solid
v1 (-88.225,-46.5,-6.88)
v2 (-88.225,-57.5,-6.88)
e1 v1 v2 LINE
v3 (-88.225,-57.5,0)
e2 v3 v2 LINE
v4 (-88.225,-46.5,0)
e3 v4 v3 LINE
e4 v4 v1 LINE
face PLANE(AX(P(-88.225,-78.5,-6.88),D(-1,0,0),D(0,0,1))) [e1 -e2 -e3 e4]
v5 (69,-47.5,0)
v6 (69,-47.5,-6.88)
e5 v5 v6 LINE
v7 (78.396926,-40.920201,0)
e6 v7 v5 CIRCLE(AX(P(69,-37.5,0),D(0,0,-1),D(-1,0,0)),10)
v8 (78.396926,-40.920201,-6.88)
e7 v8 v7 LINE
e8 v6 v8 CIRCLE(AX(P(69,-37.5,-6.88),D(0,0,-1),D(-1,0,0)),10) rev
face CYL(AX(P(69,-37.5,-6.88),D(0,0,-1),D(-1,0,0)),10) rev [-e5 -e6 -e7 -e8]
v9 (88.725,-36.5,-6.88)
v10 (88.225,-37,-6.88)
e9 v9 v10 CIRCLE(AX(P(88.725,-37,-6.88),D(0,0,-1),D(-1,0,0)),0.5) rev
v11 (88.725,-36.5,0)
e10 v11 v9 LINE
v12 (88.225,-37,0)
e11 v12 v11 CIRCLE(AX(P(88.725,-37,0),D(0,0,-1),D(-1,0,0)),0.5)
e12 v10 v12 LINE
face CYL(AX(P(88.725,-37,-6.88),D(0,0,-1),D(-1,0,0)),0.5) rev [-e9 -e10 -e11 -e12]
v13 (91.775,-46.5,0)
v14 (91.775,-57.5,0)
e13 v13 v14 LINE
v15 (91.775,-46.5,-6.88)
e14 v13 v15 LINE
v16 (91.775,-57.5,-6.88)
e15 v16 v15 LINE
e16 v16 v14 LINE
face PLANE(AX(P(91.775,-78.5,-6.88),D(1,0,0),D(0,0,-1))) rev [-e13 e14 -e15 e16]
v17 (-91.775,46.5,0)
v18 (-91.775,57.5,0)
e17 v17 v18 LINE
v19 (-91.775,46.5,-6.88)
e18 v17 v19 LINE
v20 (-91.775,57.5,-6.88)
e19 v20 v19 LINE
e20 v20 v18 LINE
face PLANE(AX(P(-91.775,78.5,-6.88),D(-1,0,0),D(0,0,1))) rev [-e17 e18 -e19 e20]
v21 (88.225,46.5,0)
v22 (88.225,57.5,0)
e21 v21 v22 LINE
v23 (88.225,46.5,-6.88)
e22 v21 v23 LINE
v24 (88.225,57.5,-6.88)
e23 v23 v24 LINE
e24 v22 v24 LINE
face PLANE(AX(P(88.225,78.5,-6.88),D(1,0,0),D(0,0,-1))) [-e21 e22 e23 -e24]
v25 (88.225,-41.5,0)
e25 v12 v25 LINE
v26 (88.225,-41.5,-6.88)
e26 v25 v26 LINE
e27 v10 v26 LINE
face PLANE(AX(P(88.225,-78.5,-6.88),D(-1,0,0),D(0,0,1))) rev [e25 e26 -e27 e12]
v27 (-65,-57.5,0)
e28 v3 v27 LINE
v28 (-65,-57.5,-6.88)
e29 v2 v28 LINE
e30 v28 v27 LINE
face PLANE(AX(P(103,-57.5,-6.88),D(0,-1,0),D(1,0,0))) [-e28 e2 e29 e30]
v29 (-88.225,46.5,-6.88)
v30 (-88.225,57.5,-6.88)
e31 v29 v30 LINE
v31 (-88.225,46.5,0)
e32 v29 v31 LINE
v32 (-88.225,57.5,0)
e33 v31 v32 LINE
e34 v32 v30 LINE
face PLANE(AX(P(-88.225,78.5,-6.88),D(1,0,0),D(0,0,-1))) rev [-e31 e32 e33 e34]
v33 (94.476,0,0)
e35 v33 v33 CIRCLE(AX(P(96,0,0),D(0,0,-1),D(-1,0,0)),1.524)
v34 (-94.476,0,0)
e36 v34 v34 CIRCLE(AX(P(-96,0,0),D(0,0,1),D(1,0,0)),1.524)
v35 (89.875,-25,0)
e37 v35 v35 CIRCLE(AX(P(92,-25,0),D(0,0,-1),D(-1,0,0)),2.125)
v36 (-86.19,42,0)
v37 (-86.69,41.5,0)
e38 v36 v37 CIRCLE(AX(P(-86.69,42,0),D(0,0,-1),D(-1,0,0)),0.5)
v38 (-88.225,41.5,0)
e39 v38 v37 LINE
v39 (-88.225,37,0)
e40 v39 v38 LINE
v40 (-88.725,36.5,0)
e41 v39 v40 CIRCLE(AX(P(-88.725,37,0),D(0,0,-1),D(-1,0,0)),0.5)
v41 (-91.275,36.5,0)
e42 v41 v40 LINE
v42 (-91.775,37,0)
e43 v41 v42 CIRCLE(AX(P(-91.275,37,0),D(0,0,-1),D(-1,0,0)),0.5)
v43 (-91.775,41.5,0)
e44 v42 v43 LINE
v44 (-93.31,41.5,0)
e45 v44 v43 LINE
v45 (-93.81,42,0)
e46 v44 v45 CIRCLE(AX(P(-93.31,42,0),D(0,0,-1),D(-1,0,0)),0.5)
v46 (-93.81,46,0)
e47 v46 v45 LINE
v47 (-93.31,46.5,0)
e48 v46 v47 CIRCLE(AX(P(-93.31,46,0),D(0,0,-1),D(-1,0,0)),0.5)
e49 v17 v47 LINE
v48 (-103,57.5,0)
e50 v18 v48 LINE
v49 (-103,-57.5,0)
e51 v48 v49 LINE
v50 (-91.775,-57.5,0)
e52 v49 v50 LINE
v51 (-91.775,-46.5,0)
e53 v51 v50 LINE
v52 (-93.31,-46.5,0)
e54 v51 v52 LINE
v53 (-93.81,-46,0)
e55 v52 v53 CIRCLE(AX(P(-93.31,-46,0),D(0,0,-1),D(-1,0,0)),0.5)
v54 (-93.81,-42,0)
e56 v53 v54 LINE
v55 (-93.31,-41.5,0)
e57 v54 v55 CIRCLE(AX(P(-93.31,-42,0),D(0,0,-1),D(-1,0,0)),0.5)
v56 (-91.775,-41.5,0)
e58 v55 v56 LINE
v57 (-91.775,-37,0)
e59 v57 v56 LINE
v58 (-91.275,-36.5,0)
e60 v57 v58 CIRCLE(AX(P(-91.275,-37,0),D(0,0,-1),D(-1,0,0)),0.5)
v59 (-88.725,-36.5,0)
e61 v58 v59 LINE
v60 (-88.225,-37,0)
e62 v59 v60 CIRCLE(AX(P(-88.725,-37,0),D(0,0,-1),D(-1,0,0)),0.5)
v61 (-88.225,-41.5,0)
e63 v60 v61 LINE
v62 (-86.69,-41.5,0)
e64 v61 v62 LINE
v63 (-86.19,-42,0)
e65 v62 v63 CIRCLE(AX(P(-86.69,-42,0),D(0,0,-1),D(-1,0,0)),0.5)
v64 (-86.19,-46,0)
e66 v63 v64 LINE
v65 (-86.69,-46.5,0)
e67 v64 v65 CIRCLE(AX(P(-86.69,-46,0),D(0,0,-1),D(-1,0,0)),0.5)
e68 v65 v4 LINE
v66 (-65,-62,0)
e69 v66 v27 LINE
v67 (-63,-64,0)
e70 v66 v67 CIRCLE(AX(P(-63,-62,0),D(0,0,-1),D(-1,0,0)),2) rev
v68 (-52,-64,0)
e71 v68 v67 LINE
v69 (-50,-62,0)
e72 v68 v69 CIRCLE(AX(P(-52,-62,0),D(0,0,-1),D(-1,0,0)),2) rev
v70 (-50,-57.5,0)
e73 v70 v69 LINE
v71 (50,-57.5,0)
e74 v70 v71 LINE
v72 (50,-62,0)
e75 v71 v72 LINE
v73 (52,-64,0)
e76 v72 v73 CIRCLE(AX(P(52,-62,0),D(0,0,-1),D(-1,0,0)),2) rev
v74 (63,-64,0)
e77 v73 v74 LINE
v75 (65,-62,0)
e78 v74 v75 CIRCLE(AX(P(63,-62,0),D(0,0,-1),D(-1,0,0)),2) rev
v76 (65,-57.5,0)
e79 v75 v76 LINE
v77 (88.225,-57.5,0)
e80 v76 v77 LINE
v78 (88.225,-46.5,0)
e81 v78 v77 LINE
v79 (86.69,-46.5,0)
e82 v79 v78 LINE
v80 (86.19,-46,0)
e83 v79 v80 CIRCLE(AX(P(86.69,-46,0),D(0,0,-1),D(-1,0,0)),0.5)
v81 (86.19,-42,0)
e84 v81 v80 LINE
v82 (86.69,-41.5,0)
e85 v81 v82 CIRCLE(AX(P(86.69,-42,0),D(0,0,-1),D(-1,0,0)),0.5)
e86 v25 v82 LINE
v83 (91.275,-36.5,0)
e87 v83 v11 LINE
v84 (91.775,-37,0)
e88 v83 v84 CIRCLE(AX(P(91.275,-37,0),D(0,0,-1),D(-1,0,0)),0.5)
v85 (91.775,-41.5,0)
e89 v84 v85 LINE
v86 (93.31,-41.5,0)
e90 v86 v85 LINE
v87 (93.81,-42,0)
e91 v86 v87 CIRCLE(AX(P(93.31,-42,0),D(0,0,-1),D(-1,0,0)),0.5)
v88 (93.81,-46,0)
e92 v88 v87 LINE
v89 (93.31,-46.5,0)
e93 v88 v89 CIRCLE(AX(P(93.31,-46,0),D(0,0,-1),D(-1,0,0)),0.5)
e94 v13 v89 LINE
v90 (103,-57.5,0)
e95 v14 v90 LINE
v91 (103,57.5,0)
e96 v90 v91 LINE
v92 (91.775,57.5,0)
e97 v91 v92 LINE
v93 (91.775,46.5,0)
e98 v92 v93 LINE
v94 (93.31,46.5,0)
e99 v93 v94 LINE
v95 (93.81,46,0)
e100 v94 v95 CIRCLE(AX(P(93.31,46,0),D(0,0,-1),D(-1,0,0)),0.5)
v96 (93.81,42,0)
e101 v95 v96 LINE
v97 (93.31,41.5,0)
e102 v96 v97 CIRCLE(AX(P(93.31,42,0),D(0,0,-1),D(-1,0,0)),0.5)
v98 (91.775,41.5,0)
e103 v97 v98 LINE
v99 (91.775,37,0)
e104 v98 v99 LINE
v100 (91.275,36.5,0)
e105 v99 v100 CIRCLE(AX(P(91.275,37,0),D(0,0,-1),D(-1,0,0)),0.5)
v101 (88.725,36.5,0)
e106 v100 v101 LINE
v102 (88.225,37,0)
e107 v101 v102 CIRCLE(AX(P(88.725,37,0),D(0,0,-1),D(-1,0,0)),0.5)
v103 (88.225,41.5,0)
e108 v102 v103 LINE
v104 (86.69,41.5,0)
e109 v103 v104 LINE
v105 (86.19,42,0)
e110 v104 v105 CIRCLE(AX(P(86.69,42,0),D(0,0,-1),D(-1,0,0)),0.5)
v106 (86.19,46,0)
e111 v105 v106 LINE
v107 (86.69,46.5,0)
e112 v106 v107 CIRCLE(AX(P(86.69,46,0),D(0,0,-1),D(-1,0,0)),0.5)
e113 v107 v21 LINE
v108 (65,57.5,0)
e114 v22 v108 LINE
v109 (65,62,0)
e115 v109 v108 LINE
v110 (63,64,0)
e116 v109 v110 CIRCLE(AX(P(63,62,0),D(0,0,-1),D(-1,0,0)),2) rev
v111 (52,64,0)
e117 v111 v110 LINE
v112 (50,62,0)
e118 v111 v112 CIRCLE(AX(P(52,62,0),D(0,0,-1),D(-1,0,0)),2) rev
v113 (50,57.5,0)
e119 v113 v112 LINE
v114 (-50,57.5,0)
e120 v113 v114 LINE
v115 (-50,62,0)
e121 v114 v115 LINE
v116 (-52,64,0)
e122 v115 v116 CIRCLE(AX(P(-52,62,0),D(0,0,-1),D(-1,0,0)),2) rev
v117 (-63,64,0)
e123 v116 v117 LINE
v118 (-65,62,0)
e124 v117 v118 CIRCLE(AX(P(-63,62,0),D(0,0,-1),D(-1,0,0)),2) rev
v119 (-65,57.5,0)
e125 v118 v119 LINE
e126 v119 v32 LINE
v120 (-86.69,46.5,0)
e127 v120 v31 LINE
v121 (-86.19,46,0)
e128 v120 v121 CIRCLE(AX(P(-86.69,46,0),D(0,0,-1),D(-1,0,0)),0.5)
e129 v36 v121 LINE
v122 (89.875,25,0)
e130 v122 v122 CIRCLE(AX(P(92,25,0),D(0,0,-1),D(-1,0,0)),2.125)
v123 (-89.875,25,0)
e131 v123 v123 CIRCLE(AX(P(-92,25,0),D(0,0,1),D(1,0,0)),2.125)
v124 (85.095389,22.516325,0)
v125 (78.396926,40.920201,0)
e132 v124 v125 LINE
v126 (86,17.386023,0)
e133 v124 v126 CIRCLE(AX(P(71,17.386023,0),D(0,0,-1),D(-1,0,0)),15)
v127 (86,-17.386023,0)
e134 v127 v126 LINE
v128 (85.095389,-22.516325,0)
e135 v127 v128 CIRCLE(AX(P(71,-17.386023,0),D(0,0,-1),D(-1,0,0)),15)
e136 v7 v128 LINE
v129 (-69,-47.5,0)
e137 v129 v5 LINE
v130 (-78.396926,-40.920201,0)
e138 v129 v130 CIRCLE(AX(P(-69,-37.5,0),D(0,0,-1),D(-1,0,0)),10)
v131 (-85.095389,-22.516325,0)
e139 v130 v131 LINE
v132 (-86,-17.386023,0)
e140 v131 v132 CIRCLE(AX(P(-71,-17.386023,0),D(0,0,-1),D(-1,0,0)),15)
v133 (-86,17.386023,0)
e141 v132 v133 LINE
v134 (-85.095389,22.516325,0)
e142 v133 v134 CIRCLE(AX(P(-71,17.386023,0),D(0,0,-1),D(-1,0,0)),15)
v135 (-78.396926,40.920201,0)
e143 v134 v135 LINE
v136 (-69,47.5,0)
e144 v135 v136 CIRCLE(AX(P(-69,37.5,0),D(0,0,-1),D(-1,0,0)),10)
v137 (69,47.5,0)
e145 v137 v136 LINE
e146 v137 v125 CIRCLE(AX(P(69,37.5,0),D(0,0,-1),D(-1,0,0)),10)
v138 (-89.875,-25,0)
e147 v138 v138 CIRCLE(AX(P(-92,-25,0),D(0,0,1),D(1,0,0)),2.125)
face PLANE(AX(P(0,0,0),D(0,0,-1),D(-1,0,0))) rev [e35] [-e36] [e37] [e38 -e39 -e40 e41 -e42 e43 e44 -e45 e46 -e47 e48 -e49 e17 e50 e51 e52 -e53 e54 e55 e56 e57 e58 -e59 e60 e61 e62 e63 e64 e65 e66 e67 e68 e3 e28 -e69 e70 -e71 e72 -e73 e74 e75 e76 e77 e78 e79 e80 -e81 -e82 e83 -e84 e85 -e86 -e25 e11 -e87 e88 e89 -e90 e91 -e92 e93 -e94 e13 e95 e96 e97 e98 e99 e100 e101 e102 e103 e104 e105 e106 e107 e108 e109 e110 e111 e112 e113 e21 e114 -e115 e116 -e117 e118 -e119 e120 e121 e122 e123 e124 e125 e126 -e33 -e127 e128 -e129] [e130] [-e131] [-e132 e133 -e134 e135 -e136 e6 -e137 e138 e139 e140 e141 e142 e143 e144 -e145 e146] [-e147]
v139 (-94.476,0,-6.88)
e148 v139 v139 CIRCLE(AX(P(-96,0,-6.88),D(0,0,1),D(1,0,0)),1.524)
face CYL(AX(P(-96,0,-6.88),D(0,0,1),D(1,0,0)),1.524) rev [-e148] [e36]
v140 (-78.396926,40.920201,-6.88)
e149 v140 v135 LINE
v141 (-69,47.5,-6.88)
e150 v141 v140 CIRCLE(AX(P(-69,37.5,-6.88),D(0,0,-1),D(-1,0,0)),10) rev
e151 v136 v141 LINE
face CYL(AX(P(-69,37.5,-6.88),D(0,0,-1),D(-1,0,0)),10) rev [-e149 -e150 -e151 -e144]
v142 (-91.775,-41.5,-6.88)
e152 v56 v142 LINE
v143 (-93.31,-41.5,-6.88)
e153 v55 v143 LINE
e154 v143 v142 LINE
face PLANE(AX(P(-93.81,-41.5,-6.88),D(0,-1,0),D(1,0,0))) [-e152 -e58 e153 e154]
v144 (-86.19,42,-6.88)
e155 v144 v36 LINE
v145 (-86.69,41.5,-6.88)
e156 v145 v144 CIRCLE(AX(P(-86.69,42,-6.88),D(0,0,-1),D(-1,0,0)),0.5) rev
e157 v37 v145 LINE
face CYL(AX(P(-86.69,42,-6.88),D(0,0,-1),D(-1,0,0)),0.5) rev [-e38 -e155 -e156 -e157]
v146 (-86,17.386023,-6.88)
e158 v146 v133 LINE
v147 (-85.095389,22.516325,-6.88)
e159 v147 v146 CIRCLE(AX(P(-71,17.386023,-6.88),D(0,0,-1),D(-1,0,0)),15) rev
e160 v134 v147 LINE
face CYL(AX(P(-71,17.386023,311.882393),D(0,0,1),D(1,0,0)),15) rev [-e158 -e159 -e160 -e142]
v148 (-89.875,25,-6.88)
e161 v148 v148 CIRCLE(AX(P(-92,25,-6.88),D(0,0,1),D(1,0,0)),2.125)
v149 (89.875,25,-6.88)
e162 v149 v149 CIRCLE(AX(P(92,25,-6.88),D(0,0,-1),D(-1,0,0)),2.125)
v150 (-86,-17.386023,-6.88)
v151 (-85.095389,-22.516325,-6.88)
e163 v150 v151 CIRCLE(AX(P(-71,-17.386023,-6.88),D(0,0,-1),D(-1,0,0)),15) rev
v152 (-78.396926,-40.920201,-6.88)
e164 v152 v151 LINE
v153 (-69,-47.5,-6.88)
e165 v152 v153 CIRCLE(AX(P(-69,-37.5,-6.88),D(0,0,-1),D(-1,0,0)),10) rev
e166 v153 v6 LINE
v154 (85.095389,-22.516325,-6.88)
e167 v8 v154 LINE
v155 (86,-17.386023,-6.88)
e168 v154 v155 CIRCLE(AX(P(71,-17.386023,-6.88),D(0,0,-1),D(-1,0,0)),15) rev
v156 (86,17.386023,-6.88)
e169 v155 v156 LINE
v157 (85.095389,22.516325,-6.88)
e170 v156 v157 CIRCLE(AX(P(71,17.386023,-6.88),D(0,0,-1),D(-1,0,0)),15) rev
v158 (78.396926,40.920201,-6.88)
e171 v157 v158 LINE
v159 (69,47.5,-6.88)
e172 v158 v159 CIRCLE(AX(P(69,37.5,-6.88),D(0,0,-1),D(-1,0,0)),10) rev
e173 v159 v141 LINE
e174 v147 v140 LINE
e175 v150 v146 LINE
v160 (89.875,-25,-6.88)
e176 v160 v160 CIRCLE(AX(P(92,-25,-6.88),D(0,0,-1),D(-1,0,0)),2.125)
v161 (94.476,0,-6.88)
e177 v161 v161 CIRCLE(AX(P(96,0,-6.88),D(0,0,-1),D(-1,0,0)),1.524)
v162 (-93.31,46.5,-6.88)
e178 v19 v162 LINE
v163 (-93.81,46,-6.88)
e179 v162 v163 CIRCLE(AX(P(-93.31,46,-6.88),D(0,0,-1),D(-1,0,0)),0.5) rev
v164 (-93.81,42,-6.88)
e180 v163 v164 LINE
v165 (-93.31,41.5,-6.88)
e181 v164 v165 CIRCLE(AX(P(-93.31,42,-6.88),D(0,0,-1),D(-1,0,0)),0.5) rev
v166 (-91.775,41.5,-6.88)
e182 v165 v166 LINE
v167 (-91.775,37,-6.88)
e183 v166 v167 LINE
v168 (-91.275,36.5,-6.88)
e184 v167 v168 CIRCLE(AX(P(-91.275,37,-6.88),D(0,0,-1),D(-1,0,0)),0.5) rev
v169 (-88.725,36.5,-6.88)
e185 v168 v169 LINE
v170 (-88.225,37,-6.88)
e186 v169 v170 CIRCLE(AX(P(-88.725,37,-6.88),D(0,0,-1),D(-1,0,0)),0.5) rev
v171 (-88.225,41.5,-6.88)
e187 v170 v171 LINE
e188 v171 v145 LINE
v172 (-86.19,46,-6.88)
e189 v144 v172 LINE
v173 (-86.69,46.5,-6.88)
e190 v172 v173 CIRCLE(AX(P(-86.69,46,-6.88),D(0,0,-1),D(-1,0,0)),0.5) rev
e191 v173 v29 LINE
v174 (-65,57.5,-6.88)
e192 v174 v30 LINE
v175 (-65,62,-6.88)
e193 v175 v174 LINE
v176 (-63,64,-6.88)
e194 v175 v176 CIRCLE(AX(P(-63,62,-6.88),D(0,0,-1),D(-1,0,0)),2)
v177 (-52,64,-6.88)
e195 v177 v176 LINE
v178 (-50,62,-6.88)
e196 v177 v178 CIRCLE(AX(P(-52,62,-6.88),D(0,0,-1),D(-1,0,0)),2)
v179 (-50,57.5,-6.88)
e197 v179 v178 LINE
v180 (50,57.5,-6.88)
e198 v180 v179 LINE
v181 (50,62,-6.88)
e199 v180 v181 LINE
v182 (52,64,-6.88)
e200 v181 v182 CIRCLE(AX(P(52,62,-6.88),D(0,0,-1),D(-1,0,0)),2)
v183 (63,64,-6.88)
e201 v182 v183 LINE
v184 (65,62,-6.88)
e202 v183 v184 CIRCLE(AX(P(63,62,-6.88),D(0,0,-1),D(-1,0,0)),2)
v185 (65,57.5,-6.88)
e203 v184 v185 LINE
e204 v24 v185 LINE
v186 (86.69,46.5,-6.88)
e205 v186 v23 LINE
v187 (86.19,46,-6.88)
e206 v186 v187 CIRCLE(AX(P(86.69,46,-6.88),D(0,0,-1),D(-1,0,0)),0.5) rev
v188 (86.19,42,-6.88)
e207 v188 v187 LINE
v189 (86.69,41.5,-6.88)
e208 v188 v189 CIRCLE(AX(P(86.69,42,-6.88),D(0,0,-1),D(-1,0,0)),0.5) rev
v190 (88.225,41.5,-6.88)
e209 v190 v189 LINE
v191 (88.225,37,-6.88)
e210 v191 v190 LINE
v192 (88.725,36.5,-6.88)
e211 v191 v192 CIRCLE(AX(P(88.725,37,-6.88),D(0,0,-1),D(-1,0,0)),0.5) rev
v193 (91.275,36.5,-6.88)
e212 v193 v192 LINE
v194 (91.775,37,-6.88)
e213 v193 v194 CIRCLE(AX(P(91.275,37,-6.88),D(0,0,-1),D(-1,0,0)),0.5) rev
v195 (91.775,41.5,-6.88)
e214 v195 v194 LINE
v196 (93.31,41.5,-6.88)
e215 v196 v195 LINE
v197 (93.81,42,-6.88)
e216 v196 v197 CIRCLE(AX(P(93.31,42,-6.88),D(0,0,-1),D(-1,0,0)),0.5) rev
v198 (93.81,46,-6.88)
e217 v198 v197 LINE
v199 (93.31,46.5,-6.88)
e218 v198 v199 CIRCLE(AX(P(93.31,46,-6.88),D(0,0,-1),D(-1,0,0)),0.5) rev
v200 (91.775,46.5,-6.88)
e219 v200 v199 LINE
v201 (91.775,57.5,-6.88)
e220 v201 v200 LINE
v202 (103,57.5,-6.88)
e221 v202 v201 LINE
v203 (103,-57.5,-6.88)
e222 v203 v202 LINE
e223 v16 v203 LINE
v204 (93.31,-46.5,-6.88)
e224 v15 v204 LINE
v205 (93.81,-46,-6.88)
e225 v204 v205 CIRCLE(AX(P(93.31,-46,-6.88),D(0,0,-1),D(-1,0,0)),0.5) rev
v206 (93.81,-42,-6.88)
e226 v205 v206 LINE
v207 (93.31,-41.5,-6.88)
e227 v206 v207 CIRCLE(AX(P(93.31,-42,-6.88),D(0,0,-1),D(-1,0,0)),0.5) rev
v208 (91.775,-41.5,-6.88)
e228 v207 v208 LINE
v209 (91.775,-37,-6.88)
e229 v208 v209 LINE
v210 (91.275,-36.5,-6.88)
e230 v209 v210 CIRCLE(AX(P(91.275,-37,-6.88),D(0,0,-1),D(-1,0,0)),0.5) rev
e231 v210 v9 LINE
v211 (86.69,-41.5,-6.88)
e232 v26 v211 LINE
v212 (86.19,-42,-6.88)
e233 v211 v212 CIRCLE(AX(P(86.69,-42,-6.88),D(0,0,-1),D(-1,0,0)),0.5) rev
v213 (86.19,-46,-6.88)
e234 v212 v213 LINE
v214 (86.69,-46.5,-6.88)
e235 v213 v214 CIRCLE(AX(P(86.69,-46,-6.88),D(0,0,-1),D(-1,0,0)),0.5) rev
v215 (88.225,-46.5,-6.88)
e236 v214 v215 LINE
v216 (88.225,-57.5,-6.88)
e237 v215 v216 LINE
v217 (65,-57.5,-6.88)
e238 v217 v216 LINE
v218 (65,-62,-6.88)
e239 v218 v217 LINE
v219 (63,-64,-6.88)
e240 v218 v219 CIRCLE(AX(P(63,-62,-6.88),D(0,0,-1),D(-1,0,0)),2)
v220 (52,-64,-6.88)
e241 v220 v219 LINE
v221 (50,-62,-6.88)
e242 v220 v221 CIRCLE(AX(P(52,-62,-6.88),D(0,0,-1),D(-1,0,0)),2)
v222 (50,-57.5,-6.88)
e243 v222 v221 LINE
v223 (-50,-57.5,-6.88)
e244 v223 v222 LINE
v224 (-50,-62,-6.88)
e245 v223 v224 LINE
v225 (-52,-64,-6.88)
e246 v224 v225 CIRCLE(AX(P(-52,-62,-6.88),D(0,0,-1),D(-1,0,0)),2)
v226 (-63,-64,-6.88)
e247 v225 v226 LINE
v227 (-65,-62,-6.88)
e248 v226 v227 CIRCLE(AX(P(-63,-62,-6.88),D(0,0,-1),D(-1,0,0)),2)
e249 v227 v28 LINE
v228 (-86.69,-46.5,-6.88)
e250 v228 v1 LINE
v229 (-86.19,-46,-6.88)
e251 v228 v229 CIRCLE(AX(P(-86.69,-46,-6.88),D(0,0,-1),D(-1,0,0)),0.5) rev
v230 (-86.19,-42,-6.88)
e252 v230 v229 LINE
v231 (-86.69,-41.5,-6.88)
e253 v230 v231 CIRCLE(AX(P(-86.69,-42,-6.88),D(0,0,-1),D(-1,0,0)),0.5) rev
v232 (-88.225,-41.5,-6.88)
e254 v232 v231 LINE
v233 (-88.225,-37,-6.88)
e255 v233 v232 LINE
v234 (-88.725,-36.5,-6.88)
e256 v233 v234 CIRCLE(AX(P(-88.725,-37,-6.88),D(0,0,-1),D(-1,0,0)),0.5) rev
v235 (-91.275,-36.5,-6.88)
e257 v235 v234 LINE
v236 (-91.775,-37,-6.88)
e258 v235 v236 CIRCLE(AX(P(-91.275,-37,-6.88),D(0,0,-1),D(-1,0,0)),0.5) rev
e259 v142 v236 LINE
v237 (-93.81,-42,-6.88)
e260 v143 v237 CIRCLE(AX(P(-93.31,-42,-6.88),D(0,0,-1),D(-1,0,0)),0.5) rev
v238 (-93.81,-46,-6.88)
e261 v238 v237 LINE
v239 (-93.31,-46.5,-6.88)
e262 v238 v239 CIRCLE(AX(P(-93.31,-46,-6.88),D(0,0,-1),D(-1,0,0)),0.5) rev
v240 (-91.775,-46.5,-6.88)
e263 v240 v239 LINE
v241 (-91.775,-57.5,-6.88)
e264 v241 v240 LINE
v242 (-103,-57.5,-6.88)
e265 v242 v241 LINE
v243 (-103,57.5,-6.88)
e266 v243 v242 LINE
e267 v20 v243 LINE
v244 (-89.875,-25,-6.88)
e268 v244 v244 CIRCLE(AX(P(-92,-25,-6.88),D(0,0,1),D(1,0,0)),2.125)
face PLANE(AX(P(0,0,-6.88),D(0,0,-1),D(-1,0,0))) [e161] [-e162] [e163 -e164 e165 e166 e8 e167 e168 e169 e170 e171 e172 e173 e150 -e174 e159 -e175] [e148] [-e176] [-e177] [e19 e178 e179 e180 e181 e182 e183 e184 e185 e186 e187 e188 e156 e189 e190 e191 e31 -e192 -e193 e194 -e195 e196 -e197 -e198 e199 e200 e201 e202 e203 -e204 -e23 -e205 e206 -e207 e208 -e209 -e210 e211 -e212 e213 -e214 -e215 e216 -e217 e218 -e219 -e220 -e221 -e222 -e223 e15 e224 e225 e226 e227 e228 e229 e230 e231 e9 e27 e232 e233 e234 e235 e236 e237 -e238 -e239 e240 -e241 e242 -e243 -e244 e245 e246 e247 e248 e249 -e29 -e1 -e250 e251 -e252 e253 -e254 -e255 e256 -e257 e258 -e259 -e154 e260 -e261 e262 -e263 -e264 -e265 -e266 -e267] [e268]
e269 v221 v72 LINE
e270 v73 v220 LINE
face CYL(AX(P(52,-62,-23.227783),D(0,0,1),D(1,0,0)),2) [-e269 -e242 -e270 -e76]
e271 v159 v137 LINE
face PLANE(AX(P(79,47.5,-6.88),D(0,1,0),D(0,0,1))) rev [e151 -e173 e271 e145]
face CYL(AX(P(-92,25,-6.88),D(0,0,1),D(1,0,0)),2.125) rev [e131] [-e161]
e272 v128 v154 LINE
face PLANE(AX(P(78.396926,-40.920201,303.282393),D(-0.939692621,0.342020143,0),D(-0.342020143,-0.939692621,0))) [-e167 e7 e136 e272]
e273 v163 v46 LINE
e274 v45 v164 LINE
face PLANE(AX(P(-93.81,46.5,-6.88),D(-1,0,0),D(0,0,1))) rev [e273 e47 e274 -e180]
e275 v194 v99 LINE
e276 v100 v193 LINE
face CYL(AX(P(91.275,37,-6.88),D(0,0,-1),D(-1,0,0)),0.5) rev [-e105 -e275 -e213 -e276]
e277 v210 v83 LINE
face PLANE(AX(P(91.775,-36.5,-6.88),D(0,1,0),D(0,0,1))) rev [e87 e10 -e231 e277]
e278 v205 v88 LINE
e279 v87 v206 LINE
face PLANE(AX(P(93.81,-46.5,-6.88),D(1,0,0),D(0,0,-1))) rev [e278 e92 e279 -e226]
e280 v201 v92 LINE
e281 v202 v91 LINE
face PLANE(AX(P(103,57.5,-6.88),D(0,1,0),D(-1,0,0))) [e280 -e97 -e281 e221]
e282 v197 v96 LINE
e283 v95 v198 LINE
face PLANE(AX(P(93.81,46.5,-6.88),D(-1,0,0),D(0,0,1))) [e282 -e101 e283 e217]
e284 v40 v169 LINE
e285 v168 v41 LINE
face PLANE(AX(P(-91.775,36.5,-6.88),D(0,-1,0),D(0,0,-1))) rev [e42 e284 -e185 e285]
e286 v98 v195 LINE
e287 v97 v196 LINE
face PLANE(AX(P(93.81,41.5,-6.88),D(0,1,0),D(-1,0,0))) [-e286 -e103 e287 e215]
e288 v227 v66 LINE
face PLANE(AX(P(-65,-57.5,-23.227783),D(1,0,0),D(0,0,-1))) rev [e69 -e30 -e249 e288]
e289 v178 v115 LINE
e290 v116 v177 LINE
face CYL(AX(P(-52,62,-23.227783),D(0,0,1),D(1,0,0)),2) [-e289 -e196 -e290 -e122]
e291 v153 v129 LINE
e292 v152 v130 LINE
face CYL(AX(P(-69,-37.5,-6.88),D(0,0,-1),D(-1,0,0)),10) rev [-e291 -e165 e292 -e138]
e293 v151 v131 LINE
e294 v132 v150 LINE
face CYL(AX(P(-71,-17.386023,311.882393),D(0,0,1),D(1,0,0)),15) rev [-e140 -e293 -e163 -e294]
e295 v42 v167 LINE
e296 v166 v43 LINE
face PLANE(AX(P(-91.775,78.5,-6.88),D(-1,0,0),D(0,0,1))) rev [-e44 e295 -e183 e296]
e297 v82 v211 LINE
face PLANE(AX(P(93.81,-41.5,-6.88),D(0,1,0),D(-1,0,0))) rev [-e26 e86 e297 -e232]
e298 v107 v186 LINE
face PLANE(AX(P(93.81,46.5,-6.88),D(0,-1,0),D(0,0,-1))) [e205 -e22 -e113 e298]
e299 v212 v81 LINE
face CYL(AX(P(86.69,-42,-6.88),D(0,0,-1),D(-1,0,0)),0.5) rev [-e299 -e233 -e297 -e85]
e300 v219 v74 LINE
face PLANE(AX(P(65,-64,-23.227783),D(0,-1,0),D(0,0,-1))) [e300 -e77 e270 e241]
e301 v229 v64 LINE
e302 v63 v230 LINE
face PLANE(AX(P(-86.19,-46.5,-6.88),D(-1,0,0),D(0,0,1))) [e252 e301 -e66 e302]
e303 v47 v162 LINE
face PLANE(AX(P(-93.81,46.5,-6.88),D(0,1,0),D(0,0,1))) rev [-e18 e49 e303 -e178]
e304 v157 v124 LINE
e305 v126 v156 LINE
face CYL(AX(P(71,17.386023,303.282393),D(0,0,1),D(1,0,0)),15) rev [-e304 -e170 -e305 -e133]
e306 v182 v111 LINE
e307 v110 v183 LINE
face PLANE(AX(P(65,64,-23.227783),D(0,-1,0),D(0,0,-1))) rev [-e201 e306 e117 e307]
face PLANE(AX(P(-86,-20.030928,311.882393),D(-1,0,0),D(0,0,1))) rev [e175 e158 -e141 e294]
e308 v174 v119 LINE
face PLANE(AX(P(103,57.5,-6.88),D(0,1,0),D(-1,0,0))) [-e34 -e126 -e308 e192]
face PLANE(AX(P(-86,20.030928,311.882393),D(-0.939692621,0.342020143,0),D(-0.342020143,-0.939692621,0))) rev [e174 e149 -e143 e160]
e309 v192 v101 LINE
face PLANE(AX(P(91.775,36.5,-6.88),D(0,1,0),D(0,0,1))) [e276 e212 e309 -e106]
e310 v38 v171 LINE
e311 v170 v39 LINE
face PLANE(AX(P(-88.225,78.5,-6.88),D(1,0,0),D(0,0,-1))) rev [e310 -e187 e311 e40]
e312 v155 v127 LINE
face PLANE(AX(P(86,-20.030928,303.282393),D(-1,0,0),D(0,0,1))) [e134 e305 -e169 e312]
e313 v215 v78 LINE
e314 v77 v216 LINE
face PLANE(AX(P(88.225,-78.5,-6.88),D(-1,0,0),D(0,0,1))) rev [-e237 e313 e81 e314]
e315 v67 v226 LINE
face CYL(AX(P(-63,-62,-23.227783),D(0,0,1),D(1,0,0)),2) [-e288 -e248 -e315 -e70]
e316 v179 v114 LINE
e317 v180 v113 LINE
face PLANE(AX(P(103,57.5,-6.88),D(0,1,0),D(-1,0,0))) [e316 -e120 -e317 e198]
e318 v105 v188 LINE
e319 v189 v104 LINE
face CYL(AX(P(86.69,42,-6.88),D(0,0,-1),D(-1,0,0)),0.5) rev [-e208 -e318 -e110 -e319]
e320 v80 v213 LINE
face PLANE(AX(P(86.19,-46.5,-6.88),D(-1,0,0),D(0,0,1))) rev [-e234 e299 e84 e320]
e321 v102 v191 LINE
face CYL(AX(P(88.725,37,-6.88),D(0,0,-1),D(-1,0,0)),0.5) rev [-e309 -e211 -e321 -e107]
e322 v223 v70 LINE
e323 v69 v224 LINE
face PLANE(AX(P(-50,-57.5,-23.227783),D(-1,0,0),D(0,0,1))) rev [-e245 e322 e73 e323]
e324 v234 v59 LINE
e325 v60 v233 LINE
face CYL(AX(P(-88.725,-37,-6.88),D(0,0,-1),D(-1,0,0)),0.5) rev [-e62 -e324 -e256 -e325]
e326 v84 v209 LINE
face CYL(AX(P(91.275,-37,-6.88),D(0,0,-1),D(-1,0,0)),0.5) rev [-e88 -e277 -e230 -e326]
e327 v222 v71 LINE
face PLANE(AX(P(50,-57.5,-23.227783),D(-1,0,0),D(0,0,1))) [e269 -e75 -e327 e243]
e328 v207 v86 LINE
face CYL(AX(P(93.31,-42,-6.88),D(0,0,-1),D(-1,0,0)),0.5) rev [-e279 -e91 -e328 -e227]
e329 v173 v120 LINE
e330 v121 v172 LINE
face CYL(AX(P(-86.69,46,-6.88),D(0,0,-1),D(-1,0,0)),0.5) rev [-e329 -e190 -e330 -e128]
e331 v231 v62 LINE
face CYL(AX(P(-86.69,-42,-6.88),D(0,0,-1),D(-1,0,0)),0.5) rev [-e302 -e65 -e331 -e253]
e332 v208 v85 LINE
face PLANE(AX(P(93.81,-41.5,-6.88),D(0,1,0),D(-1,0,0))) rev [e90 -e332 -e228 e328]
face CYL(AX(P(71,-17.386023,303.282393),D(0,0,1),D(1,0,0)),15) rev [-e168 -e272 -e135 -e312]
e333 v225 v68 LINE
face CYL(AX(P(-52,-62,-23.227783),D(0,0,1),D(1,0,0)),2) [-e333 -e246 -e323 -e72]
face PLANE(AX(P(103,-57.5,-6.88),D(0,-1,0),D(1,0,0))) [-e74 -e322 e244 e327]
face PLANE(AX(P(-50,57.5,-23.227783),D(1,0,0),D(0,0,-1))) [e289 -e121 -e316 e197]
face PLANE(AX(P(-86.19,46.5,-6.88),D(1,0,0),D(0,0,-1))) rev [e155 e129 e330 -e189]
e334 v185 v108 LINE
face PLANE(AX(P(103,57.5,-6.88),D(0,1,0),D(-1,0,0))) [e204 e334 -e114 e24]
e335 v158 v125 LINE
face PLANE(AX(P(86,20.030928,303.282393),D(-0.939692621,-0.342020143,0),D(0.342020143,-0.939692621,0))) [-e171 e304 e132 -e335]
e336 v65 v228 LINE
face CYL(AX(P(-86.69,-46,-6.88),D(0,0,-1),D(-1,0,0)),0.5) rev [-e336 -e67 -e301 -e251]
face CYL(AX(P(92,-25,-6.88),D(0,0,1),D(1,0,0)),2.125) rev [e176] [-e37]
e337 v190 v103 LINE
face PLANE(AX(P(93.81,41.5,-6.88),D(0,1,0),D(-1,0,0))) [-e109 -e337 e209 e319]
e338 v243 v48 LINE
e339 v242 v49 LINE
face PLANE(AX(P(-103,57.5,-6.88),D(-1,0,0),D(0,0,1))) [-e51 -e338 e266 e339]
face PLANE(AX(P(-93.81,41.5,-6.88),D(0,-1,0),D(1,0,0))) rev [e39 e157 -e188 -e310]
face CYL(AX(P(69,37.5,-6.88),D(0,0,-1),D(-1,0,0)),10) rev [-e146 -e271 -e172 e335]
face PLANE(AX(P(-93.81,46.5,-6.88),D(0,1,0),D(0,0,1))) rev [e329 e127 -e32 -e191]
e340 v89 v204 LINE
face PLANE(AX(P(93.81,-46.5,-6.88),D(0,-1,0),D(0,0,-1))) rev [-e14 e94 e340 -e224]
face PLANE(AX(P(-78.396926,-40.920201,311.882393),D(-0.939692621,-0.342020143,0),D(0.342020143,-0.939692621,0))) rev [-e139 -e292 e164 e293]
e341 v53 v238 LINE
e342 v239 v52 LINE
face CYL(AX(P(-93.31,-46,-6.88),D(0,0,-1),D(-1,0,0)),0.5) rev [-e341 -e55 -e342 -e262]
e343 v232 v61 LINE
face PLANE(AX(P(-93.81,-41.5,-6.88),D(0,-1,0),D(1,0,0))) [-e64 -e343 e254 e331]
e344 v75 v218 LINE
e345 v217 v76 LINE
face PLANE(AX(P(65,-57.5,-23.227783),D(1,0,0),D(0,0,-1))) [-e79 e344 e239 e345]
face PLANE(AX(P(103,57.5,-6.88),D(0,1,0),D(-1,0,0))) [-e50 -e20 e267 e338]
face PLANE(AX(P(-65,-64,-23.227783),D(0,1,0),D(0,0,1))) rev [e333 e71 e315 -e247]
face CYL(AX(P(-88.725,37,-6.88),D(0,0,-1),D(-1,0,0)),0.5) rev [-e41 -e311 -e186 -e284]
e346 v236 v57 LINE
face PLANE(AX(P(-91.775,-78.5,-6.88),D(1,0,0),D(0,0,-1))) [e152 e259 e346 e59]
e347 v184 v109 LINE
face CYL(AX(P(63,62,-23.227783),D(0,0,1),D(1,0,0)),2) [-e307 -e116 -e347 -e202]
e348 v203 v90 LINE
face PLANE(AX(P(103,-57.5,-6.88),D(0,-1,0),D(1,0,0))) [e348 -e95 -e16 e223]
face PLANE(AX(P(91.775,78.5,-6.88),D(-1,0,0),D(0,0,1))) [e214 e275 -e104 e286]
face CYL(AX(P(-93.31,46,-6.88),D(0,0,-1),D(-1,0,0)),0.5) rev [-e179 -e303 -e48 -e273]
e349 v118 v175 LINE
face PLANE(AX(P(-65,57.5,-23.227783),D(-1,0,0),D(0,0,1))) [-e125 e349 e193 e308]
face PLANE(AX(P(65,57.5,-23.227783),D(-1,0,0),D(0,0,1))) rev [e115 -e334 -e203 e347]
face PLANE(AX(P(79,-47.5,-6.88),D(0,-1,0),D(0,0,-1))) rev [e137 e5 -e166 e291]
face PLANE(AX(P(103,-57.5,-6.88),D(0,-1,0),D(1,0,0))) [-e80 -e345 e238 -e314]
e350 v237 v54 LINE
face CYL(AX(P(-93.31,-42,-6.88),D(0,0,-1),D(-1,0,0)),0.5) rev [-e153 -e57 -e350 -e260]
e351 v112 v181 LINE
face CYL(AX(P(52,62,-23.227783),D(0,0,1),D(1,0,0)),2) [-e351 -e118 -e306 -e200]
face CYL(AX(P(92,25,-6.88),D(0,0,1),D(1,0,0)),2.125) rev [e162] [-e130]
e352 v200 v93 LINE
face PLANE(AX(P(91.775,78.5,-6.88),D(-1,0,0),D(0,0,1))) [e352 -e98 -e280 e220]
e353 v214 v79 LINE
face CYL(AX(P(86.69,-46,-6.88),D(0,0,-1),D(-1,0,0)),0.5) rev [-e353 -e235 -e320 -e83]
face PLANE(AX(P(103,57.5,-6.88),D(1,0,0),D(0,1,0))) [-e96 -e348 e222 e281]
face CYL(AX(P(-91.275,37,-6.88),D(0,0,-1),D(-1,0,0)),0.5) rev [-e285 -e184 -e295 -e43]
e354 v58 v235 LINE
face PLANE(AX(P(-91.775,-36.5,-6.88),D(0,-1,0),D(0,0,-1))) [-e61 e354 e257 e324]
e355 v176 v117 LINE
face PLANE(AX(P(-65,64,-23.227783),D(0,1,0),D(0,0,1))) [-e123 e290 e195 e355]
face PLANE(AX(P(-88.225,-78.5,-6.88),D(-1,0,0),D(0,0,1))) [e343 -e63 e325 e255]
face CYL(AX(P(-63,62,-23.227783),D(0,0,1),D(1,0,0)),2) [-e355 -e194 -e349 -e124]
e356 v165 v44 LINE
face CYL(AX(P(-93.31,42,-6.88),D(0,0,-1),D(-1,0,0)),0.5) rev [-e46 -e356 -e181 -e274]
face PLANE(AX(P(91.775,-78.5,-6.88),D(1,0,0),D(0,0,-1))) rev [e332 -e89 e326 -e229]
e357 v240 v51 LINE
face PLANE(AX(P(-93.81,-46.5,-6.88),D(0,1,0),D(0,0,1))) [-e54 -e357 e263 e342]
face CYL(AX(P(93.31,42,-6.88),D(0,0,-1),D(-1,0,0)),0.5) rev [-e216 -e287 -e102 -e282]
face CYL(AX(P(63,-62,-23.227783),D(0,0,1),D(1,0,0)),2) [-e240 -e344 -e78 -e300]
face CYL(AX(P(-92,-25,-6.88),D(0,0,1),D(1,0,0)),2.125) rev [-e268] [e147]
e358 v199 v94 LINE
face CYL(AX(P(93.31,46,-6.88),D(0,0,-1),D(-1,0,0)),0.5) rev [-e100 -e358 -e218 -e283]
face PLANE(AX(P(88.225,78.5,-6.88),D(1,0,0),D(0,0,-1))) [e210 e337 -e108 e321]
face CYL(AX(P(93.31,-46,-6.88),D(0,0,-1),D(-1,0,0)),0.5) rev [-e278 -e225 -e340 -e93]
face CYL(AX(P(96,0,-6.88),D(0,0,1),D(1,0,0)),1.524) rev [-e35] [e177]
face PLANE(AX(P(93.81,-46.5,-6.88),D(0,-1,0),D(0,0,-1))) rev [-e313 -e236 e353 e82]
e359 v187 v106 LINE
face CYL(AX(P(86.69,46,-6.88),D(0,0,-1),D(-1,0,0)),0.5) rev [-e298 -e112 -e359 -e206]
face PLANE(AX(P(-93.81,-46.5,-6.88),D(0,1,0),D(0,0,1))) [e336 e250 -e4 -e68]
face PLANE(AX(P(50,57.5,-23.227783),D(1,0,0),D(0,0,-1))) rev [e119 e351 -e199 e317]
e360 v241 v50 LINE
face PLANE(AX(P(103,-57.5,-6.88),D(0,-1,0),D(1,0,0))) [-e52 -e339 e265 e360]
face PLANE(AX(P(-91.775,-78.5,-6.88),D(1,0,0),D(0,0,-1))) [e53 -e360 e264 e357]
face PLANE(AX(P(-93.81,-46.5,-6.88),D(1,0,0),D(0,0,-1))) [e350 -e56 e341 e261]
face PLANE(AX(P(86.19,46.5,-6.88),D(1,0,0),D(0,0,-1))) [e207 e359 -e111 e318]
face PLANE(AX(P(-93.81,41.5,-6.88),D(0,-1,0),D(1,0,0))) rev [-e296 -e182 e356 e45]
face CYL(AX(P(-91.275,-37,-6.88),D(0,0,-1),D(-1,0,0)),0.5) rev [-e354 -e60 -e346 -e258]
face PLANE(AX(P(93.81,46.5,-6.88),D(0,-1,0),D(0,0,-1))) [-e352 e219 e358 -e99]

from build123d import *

# Parameters (mm, degrees)
SKETCH1_W            = 206
SKETCH1_H            = 115
BOSS_EXTRUDE1_DEPTH  = 6.88
SKETCH2_W            = 158
SKETCH2_H            = 95
CUT_EXTRUDE1_DEPTH   = 119.163380114
FILLET1_R            = 10
SKETCH3_W            = 3.55
SKETCH3_H            = 42
CUT_EXTRUDE2_DEPTH   = 119.163380114
SKETCH4_W            = 7.62
SKETCH4_H            = 5
CUT_EXTRUDE3_DEPTH   = 119.163380114
FILLET4_R            = 0.5
SKETCH5_W            = 15
SKETCH5_H            = 6.5
BOSS_EXTRUDE2_DEPTH  = 6.88
FILLET3_R            = 2
FILLET4_OF_MIRROR1_R = 0.5
FILLET3_OF_MIRROR1_R = 2
CUT_EXTRUDE4_START   = -6.88
CUT_EXTRUDE4_DEPTH   = 6.88
SKETCH7_R            = 2.125
SKETCH7_R_2          = 1.524
CUT_EXTRUDE5_DEPTH   = 122.459188207
MIRROR2_START        = -6.88
MIRROR2_OUTLINE_R    = 2.125
MIRROR2_OUTLINE_R_2  = 1.524
MIRROR2_DEPTH        = 6.88
MIRROR2_2_DEPTH      = 6.88
FILLET2_R            = 15


# Read off the part's stored shape, not the designer's step: Cut-Extrude4, Mirror2
with BuildPart() as part:
    # Sketch1 → Boss-Extrude1 (new body)
    with BuildSketch(Plane.XY):
        Rectangle(SKETCH1_W, SKETCH1_H)
    extrude(amount=-BOSS_EXTRUDE1_DEPTH)

    # Sketch2 → Cut-Extrude1 (cut, through all)
    with BuildSketch(Plane.XY):
        Rectangle(SKETCH2_W, SKETCH2_H)
    extrude(amount=-CUT_EXTRUDE1_DEPTH, mode=Mode.SUBTRACT)

    # Fillet1
    fillet1_edges = [part.edges().sort_by_distance(p)[0] for p in [
        (-79, -47.5, -3.44),
        (-79, 47.5, -3.44),
        (79, 47.5, -3.44),
        (79, -47.5, -3.44),
    ]]
    fillet(fillet1_edges, radius=FILLET1_R)

    # Sketch3 → Cut-Extrude2 (cut, through all)
    with BuildSketch(Plane.XY):
        with Locations((-90, 57.5)):
            Rectangle(SKETCH3_W, SKETCH3_H)
    cut_extrude2 = extrude(amount=-CUT_EXTRUDE2_DEPTH, mode=Mode.SUBTRACT)

    # Sketch4 → Cut-Extrude3 (cut, through all)
    with BuildSketch(Plane.XY):
        with Locations((-90, 44)):
            Rectangle(SKETCH4_W, SKETCH4_H)
    cut_extrude3 = extrude(amount=-CUT_EXTRUDE3_DEPTH, mode=Mode.SUBTRACT)

    # Fillet4
    fillet4_edges = [part.edges().sort_by_distance(p)[0] for p in [
        (-88.225, 36.5, -3.44),
        (-91.775, 36.5, -3.44),
        (-86.19, 41.5, -3.44),
        (-93.81, 46.5, -3.44),
        (-86.19, 46.5, -3.44),
        (-93.81, 41.5, -3.44),
    ]]
    fillet(fillet4_edges, radius=FILLET4_R)

    # Sketch5 → Boss-Extrude2 (add)
    with BuildSketch(Plane.XY):
        with Locations((-57.5, 60.75)):
            Rectangle(SKETCH5_W, SKETCH5_H)
    boss_extrude2 = extrude(amount=-BOSS_EXTRUDE2_DEPTH)

    # Fillet3
    fillet3_edges = [part.edges().sort_by_distance(p)[0] for p in [
        (-50, 64, -3.44),
        (-65, 64, -3.44),
    ]]
    fillet(fillet3_edges, radius=FILLET3_R)

    # Mirror1: Cut-Extrude2, Cut-Extrude3, Boss-Extrude2 across plane
    add(cut_extrude2.mirror(Plane.ZX), mode=Mode.SUBTRACT)
    add(cut_extrude3.mirror(Plane.ZX), mode=Mode.SUBTRACT)
    add(boss_extrude2.mirror(Plane.ZX))

    # Fillet4 of Mirror1
    fillet4_of_mirror1_edges = [part.edges().sort_by_distance(p)[0] for p in [
        (-88.225, -36.5, -3.44),
        (-91.775, -36.5, -3.44),
        (-86.19, -41.5, -3.44),
        (-93.81, -46.5, -3.44),
        (-86.19, -46.5, -3.44),
        (-93.81, -41.5, -3.44),
    ]]
    fillet(fillet4_of_mirror1_edges, radius=FILLET4_OF_MIRROR1_R)

    # Fillet3 of Mirror1
    fillet3_of_mirror1_edges = [part.edges().sort_by_distance(p)[0] for p in [
        (-50, -64, -3.44),
        (-65, -64, -3.44),
    ]]
    fillet(fillet3_of_mirror1_edges, radius=FILLET3_OF_MIRROR1_R)

    # Cut-Extrude4 outline → Cut-Extrude4 (cut)
    with BuildSketch(Plane.XY.offset(CUT_EXTRUDE4_START)):
        with BuildLine():
            Line((-78.396926208, 40.920201433), (-86, 20.030927871))
            Line((-86, 20.030927871), (-86, -20.030927871))
            Line((-86, -20.030927871), (-78.396926208, -40.920201433))
            ThreePointArc((-78.396926208, -40.920201433), (-78.84807753, -39.236481777), (-79, -37.5))
            Line((-79, -37.5), (-79, 37.5))
            ThreePointArc((-79, 37.5), (-78.84807753, 39.236481777), (-78.396926208, 40.920201433))
        make_face()
    extrude(amount=CUT_EXTRUDE4_DEPTH, mode=Mode.SUBTRACT)

    # Sketch7 → Cut-Extrude5 (cut, through all)
    with BuildSketch(Plane.XY):
        with Locations((-92, 25)):
            Circle(SKETCH7_R)
        with Locations((-92, -25)):
            Circle(SKETCH7_R)
        with Locations((-96, 0)):
            Circle(SKETCH7_R_2)
    extrude(amount=-CUT_EXTRUDE5_DEPTH, mode=Mode.SUBTRACT)

    # Mirror2 outline → Mirror2 (cut)
    with BuildSketch(Plane.XY.offset(MIRROR2_START)):
        with BuildLine():
            Line((88.225, 57.5), (88.225, 46.5))
            Line((88.225, 46.5), (86.69, 46.5))
            ThreePointArc((86.69, 46.5), (86.336446609, 46.353553391), (86.19, 46))
            Line((86.19, 46), (86.19, 42))
            ThreePointArc((86.19, 42), (86.336446609, 41.646446609), (86.69, 41.5))
            Line((86.69, 41.5), (88.225, 41.5))
            Line((88.225, 41.5), (88.225, 37))
            ThreePointArc((88.225, 37), (88.371446609, 36.646446609), (88.725, 36.5))
            Line((88.725, 36.5), (91.275, 36.5))
            ThreePointArc((91.275, 36.5), (91.628553391, 36.646446609), (91.775, 37))
            Line((91.775, 37), (91.775, 41.5))
            Line((91.775, 41.5), (93.31, 41.5))
            ThreePointArc((93.31, 41.5), (93.663553391, 41.646446609), (93.81, 42))
            Line((93.81, 42), (93.81, 46))
            ThreePointArc((93.81, 46), (93.663553391, 46.353553391), (93.31, 46.5))
            Line((93.31, 46.5), (91.775, 46.5))
            Line((91.775, 46.5), (91.775, 57.5))
            Line((91.775, 57.5), (88.225, 57.5))
        make_face()
        with BuildLine():
            ThreePointArc((88.725, -36.5), (88.371446609, -36.646446609), (88.225, -37))
            Line((88.225, -37), (88.225, -41.5))
            Line((88.225, -41.5), (86.69, -41.5))
            ThreePointArc((86.69, -41.5), (86.336446609, -41.646446609), (86.19, -42))
            Line((86.19, -42), (86.19, -46))
            ThreePointArc((86.19, -46), (86.336446609, -46.353553391), (86.69, -46.5))
            Line((86.69, -46.5), (88.225, -46.5))
            Line((88.225, -46.5), (88.225, -57.5))
            Line((88.225, -57.5), (91.775, -57.5))
            Line((91.775, -57.5), (91.775, -46.5))
            Line((91.775, -46.5), (93.31, -46.5))
            ThreePointArc((93.31, -46.5), (93.663553391, -46.353553391), (93.81, -46))
            Line((93.81, -46), (93.81, -42))
            ThreePointArc((93.81, -42), (93.663553391, -41.646446609), (93.31, -41.5))
            Line((93.31, -41.5), (91.775, -41.5))
            Line((91.775, -41.5), (91.775, -37))
            ThreePointArc((91.775, -37), (91.628553391, -36.646446609), (91.275, -36.5))
            Line((91.275, -36.5), (88.725, -36.5))
        make_face()
        with BuildLine():
            Line((86, -20.030927871), (86, 20.030927871))
            Line((86, 20.030927871), (78.396926208, 40.920201433))
            ThreePointArc((78.396926208, 40.920201433), (78.84807753, 39.236481777), (79, 37.5))
            Line((79, 37.5), (79, -37.5))
            ThreePointArc((79, -37.5), (78.84807753, -39.236481777), (78.396926208, -40.920201433))
            Line((78.396926208, -40.920201433), (86, -20.030927871))
        make_face()
        with Locations((92, 25)):
            Circle(MIRROR2_OUTLINE_R)
        with Locations((92, -25)):
            Circle(MIRROR2_OUTLINE_R)
        with Locations((96, 0)):
            Circle(MIRROR2_OUTLINE_R_2)
    extrude(amount=MIRROR2_DEPTH, mode=Mode.SUBTRACT)

    # Mirror2 2 outline → Mirror2 2 (add)
    with BuildSketch(Plane.XY.offset(MIRROR2_START)):
        with BuildLine():
            Line((50, 57.5), (65, 57.5))
            Line((65, 57.5), (65, 62))
            ThreePointArc((65, 62), (64.414213562, 63.414213562), (63, 64))
            Line((63, 64), (52, 64))
            ThreePointArc((52, 64), (50.585786438, 63.414213562), (50, 62))
            Line((50, 62), (50, 57.5))
        make_face()
        with BuildLine():
            Line((65, -62), (65, -57.5))
            Line((65, -57.5), (50, -57.5))
            Line((50, -57.5), (50, -62))
            ThreePointArc((50, -62), (50.585786438, -63.414213562), (52, -64))
            Line((52, -64), (63, -64))
            ThreePointArc((63, -64), (64.414213562, -63.414213562), (65, -62))
        make_face()
    extrude(amount=MIRROR2_2_DEPTH)

    # Fillet2
    fillet2_edges = [part.edges().sort_by_distance(p)[0] for p in [
        (-86, -20.030927871, -3.44),
        (-86, 20.030927871, -3.44),
        (86, 20.030927871, -3.44),
        (86, -20.030927871, -3.44),
    ]]
    fillet(fillet2_edges, radius=FILLET2_R)


solid = part.part
